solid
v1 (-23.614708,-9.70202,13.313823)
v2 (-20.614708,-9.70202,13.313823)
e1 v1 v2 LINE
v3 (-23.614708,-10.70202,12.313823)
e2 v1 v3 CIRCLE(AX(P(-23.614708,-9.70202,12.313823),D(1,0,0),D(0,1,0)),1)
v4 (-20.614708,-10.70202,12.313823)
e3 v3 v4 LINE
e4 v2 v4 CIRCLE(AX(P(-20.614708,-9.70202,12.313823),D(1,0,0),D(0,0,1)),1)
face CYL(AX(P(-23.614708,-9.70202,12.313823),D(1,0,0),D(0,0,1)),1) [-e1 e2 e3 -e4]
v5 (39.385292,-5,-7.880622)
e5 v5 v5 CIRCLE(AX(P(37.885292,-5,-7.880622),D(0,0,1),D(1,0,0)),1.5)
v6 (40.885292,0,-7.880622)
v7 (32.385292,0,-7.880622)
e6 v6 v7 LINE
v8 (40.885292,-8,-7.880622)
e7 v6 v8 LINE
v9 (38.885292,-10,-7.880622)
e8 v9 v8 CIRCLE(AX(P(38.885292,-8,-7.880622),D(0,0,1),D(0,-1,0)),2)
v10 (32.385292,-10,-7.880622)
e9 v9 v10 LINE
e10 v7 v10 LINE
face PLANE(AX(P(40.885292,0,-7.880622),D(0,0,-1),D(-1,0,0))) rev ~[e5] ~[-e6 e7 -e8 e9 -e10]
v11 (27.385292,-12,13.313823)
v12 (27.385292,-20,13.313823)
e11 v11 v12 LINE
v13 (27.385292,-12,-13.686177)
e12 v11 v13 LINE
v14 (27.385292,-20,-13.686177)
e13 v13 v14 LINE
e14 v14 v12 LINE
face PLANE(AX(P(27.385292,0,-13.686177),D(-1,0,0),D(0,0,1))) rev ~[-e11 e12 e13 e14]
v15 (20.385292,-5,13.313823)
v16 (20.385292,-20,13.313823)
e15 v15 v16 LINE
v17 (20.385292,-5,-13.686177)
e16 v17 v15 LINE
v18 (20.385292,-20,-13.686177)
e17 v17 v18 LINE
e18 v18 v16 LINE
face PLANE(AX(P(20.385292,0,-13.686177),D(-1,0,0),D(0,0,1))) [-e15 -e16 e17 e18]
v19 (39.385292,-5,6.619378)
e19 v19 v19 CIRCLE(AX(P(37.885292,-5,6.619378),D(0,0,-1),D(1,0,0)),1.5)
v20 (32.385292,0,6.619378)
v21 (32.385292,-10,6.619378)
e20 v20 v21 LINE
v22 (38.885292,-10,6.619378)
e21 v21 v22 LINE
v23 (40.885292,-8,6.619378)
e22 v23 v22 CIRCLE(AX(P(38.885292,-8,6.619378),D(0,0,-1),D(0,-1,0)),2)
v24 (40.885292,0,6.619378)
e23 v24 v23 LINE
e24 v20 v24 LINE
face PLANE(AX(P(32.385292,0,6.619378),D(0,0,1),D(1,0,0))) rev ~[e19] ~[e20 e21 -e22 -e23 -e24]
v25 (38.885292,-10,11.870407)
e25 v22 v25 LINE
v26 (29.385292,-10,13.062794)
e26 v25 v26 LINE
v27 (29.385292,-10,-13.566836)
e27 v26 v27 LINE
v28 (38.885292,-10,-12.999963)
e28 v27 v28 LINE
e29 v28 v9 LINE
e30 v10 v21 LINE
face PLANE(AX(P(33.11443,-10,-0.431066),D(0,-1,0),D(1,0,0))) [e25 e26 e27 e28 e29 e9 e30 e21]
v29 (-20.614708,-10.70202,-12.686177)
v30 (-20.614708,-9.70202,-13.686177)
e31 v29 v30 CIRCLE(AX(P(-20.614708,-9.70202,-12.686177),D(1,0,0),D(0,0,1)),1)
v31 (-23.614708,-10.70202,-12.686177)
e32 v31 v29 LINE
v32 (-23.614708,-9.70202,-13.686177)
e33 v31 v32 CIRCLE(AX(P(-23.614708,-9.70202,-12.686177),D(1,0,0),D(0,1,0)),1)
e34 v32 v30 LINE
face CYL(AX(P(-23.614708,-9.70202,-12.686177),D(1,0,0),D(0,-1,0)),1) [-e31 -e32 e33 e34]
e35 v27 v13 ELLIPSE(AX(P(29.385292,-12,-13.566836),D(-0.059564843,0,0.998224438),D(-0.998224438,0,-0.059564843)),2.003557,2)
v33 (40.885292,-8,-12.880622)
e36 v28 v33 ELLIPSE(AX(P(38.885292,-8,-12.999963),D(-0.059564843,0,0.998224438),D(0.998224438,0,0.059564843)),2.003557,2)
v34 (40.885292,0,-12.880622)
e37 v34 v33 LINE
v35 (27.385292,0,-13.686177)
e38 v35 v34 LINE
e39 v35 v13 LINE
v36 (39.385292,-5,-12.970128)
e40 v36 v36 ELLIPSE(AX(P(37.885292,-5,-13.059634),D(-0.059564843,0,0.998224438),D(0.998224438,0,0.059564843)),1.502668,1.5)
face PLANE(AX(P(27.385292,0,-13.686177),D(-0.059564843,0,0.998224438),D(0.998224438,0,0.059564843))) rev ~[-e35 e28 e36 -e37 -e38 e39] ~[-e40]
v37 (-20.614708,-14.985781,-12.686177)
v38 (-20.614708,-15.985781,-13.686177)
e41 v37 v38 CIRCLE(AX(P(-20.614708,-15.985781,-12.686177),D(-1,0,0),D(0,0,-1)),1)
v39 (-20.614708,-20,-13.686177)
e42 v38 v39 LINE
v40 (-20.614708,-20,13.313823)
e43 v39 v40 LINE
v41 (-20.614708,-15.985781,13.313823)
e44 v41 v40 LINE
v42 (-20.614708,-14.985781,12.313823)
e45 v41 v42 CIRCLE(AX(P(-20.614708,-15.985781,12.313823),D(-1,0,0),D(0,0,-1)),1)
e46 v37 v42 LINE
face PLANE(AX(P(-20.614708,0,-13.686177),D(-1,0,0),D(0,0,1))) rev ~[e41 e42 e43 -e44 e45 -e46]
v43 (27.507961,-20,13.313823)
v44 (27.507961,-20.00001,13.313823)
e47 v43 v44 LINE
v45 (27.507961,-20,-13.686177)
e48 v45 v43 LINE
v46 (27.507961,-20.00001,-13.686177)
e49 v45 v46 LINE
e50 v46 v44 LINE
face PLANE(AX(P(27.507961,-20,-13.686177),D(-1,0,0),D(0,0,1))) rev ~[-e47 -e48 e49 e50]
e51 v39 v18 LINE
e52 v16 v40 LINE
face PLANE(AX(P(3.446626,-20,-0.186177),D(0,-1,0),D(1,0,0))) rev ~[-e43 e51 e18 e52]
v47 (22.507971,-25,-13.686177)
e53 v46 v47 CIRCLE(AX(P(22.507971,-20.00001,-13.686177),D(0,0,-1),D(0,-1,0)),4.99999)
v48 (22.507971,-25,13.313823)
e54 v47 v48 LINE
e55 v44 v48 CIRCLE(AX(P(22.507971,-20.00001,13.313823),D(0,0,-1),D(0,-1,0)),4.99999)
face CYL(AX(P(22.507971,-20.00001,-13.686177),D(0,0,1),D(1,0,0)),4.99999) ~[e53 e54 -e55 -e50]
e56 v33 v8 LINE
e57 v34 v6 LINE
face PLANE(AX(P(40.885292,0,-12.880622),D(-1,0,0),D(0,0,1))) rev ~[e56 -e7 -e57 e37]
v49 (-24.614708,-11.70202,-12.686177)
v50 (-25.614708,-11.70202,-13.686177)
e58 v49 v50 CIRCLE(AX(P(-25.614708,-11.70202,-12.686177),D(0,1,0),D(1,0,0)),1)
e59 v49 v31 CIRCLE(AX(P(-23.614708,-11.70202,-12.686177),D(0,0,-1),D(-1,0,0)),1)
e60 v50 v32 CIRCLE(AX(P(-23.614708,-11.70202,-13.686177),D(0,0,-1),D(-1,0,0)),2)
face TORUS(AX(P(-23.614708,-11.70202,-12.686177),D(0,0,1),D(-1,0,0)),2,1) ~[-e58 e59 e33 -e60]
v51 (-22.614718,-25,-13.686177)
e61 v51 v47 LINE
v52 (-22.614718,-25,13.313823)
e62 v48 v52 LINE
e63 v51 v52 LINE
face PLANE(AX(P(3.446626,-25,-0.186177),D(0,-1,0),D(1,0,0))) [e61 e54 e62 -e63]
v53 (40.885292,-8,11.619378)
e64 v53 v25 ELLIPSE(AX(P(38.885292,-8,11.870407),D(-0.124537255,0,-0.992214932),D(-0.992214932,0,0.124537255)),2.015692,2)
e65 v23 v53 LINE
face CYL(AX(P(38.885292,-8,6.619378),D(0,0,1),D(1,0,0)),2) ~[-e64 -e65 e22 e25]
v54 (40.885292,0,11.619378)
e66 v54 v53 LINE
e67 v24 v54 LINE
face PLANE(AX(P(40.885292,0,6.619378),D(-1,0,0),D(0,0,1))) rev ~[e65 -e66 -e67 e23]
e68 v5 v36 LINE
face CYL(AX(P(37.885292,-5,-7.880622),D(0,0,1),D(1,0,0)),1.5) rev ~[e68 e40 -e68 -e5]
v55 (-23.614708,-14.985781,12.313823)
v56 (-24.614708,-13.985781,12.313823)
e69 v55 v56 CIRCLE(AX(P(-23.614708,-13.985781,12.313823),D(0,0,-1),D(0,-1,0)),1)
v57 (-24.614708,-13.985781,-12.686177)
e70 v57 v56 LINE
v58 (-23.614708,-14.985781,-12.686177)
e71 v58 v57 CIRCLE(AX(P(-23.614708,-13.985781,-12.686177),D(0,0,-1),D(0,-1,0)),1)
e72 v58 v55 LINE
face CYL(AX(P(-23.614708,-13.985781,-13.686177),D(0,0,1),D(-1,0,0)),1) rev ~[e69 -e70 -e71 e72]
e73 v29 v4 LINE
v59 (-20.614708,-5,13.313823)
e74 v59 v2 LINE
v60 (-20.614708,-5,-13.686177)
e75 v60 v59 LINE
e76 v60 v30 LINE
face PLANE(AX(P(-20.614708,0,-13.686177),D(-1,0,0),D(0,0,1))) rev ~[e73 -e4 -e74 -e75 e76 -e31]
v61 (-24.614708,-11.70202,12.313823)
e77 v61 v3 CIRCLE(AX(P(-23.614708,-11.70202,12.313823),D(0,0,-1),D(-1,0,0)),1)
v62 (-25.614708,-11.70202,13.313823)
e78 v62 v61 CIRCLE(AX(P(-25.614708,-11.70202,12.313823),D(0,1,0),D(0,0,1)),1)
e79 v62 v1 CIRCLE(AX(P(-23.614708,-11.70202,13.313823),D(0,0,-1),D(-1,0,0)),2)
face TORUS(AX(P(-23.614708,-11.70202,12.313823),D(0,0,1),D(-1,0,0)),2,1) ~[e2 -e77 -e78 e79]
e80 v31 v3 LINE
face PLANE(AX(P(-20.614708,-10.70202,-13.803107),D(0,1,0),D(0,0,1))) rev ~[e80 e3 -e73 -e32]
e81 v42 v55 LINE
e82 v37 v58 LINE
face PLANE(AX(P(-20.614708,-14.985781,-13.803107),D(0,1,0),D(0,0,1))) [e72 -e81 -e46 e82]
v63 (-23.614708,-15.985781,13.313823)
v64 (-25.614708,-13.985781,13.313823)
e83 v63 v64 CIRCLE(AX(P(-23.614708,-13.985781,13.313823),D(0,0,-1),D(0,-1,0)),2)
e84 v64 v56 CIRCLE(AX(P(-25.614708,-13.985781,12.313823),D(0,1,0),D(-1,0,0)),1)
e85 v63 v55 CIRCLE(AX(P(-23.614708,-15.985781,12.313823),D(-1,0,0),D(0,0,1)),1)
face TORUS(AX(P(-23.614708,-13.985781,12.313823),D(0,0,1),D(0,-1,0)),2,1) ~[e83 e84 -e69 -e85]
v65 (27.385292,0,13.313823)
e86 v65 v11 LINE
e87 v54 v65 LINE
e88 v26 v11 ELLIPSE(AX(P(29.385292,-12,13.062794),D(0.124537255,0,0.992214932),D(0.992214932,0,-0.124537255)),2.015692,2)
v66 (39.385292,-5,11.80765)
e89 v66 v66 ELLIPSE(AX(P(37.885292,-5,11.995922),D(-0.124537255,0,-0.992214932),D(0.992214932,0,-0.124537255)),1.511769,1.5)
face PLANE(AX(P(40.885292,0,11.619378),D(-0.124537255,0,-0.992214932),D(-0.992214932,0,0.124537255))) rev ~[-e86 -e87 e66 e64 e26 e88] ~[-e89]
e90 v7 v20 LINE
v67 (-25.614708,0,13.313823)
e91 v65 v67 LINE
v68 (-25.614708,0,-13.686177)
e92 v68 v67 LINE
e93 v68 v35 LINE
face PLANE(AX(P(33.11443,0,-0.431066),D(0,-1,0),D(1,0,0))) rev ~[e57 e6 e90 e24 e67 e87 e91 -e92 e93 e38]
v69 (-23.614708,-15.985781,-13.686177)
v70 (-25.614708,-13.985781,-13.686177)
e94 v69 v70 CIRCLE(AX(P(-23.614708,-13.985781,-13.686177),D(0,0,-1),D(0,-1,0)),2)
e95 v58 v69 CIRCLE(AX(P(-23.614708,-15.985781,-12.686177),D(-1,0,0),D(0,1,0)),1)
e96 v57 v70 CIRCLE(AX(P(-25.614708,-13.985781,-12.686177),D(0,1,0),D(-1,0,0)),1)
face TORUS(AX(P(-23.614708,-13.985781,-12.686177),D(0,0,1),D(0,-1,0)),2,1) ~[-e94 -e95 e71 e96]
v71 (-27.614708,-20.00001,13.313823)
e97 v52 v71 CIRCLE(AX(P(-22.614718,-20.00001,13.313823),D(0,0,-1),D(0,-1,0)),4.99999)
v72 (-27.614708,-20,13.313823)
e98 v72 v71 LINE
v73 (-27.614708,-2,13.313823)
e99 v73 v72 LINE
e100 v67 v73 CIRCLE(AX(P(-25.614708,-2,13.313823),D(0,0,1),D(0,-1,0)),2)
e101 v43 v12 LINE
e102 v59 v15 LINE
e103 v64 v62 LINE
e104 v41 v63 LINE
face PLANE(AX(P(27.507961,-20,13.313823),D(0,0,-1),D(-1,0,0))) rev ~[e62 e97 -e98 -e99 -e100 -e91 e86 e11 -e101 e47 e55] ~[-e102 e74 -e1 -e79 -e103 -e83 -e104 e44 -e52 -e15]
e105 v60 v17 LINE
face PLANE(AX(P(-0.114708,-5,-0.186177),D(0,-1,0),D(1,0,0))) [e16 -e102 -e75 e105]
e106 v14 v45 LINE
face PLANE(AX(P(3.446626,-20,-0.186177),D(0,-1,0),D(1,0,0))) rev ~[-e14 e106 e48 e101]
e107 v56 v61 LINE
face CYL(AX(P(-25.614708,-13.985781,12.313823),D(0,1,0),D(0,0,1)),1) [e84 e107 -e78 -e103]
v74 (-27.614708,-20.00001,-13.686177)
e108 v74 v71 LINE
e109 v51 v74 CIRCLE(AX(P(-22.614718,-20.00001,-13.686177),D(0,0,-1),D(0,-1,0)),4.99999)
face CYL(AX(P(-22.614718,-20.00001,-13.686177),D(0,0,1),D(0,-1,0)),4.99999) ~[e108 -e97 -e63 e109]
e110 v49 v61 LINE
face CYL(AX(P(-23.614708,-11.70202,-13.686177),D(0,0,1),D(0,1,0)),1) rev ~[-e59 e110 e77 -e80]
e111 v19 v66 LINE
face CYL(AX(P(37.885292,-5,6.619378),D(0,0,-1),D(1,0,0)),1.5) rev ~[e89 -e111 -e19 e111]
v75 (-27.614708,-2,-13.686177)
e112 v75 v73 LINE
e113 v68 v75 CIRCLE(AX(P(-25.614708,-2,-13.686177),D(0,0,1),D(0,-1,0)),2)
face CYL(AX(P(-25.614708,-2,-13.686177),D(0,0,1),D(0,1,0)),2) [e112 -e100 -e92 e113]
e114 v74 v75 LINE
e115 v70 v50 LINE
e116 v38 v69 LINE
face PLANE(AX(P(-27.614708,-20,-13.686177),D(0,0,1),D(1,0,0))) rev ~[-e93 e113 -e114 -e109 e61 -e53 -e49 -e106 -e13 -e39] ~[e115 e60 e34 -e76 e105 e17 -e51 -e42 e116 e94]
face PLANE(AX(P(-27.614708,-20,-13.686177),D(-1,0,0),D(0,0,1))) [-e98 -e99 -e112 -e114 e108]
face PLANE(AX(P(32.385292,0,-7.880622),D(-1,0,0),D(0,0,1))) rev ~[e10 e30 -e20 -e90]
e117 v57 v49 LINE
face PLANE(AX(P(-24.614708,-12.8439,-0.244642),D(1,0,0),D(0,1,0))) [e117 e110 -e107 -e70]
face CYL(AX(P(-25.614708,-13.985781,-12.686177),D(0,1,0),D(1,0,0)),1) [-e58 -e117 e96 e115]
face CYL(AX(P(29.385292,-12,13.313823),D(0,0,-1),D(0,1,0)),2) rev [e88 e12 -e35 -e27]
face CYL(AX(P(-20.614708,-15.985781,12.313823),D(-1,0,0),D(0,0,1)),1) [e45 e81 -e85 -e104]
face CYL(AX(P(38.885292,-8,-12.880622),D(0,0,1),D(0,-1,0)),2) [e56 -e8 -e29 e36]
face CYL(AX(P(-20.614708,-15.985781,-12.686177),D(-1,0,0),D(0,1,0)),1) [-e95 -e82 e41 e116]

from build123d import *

# Parameters (mm, degrees)
F0_W           = 41
F0_H           = 27
F1_DEPTH       = 5
F0_W_2         = 7
F2_DEPTH       = 20
F3_DEPTH       = 20
F4_DEPTH       = 10
F5_R           = 2
F8_D           = 3
F8_DEPTH       = 12
F8_TIP         = 0.9012909285
F8_ON_F6_D     = 3
F8_ON_F6_DEPTH = 12
F8_ON_F6_TIP   = 0.9012909285
F9_W           = 48.1226687921
F9_H           = 27
F9_W_2         = 55.1226687921
F10_DEPTH      = 5
F11_R          = 4.99999
F12_W          = 4.2837616056
F12_H          = 27.1169293898
F13_DEPTH      = 4
F14_F1_R       = 1
F14_F2_R       = 1
F15_R          = 1


# Not quite as in the source:
# - a fillet or chamfer is up to 0.001 mm smaller than in the source, because OpenCascade refuses the exact size


with BuildPart() as f1:
    # F0 (on Front) → F1 (new body)
    with BuildSketch(Plane.XZ):
        with Locations((-0.1147079957, -0.1861773429)):
            Rectangle(F0_W, F0_H)
    extrude(amount=F1_DEPTH)

    # F0 (on Front) → F2 (join)
    with BuildSketch(Plane.XZ):
        with Locations((23.8852920043, -0.1861773429)):
            Rectangle(F0_W_2, F0_H)
    extrude(amount=F2_DEPTH)

    # F0 (on Front) → F3 (join)
    with BuildSketch(Plane.XZ):
        with Locations((-24.1147079957, -0.1861773429)):
            Rectangle(F0_W_2, F0_H)
    extrude(amount=F3_DEPTH)

    # F0 (on Front) → F4 (join)
    with BuildSketch(Plane.XZ):
        Polygon((40.8852920043, 11.6193783459), (27.3852920043, 13.3138226571), (27.3852920043, -13.6861773429), (40.8852920043, -12.8806216541), (40.8852920043, -7.8806216541), (32.3852920043, -7.8806216541), (32.3852920043, 6.6193783459), (40.8852920043, 6.6193783459), align=None)
    extrude(amount=F4_DEPTH)

    # F5
    f5_edges = [f1.edges().sort_by_distance(p)[0] for p in [
        (27.385292, -10, -0.186177),
        (-27.614708, 0, -0.186177),
        (40.885292, -10, -10.380622),
        (40.885292, -10, 9.119378),
    ]]
    fillet(f5_edges, radius=F5_R)

    # F8 (one way)
    with BuildSketch(Plane(origin=(0, 0, 6.6193783459), x_dir=(1, 0, 0), z_dir=(0, 0, -1))):
        with Locations((37.8852920043, 5)):
            Circle(F8_D / 2)
    extrude(amount=-F8_DEPTH, mode=Mode.SUBTRACT)
    with Locations(Plane(origin=(0, 0, 6.6193783459), x_dir=(1, 0, 0), z_dir=(0, 0, -1))):
        with Locations((37.8852920043, 5)):
            with Locations((0, 0, -(F8_DEPTH + F8_TIP / 2))):  # 118° drill point
                Cone(0, F8_D / 2, F8_TIP, mode=Mode.SUBTRACT)

    # F8 on F6 (one way)
    with BuildSketch(Plane.XY.offset(-7.8806216541)):
        with Locations((37.8852920043, -5)):
            Circle(F8_ON_F6_D / 2)
    extrude(amount=-F8_ON_F6_DEPTH, mode=Mode.SUBTRACT)
    with Locations(Plane.XY.offset(-7.8806216541)):
        with Locations((37.8852920043, -5)):
            with Locations((0, 0, -(F8_ON_F6_DEPTH + F8_ON_F6_TIP / 2))):  # 118° drill point
                Cone(0, F8_ON_F6_D / 2, F8_ON_F6_TIP, mode=Mode.SUBTRACT)

    # F9 (on face) → F10 (join)
    with BuildSketch(Plane.XZ.offset(20)):
        with Locations((3.4466264003, -0.1861773429)):
            Rectangle(F9_W, F9_H)
        with Locations((-0.0533735997, -0.1861773429)):
            Rectangle(F9_W_2, F9_H)
    extrude(amount=F10_DEPTH)

    # F11 (radius 5 in the source; OpenCascade refuses exactly that, so slightly less here)
    f11_edges = [f1.edges().sort_by_distance(p)[0] for p in [
        (27.507961, -25, -0.186177),
        (-27.614708, -25, -0.186177),
    ]]
    fillet(f11_edges, radius=F11_R)

    # F12 (on face) → F13 (cut)
    with BuildSketch(Plane.YZ.offset(-20.6147079957)):
        with Locations((-12.8439003602, -0.2446420378)):
            Rectangle(F12_W, F12_H)
    extrude(amount=-F13_DEPTH, mode=Mode.SUBTRACT)

    # F14: fillet of radius 1 on 3 edges, made by hand

    # F14_f1
    f14_f1_edges = [f1.edges().sort_by_distance(p)[0] for p in [
        (-24.6147079957, -14.985781163, -0.1861773429),
        (-24.6147079957, -10.7020195574, -0.1861773429),
    ]]
    fillet(f14_f1_edges, radius=F14_F1_R)

    # F14_f2
    f14_f2_edges = [f1.edges().sort_by_distance(p)[0] for p in [
        (-24.6147079957, -12.8439003602, 13.3138226571),
        (-24.3218147769, -10.9949127762, 13.3138226571),
        (-24.3218147769, -14.6928879442, 13.3138226571),
    ]]
    fillet(f14_f2_edges, radius=F14_F2_R)

    # F15
    f15_edges = [f1.edges().sort_by_distance(p)[0] for p in [
        (-22.114708, -14.985781, -13.686177),
        (-22.114708, -10.70202, -13.686177),
        (-24.321815, -10.994913, -13.686177),
        (-24.614708, -12.8439, -13.686177),
        (-24.321815, -14.692888, -13.686177),
    ]]
    fillet(f15_edges, radius=F15_R)


solid = f1.part
